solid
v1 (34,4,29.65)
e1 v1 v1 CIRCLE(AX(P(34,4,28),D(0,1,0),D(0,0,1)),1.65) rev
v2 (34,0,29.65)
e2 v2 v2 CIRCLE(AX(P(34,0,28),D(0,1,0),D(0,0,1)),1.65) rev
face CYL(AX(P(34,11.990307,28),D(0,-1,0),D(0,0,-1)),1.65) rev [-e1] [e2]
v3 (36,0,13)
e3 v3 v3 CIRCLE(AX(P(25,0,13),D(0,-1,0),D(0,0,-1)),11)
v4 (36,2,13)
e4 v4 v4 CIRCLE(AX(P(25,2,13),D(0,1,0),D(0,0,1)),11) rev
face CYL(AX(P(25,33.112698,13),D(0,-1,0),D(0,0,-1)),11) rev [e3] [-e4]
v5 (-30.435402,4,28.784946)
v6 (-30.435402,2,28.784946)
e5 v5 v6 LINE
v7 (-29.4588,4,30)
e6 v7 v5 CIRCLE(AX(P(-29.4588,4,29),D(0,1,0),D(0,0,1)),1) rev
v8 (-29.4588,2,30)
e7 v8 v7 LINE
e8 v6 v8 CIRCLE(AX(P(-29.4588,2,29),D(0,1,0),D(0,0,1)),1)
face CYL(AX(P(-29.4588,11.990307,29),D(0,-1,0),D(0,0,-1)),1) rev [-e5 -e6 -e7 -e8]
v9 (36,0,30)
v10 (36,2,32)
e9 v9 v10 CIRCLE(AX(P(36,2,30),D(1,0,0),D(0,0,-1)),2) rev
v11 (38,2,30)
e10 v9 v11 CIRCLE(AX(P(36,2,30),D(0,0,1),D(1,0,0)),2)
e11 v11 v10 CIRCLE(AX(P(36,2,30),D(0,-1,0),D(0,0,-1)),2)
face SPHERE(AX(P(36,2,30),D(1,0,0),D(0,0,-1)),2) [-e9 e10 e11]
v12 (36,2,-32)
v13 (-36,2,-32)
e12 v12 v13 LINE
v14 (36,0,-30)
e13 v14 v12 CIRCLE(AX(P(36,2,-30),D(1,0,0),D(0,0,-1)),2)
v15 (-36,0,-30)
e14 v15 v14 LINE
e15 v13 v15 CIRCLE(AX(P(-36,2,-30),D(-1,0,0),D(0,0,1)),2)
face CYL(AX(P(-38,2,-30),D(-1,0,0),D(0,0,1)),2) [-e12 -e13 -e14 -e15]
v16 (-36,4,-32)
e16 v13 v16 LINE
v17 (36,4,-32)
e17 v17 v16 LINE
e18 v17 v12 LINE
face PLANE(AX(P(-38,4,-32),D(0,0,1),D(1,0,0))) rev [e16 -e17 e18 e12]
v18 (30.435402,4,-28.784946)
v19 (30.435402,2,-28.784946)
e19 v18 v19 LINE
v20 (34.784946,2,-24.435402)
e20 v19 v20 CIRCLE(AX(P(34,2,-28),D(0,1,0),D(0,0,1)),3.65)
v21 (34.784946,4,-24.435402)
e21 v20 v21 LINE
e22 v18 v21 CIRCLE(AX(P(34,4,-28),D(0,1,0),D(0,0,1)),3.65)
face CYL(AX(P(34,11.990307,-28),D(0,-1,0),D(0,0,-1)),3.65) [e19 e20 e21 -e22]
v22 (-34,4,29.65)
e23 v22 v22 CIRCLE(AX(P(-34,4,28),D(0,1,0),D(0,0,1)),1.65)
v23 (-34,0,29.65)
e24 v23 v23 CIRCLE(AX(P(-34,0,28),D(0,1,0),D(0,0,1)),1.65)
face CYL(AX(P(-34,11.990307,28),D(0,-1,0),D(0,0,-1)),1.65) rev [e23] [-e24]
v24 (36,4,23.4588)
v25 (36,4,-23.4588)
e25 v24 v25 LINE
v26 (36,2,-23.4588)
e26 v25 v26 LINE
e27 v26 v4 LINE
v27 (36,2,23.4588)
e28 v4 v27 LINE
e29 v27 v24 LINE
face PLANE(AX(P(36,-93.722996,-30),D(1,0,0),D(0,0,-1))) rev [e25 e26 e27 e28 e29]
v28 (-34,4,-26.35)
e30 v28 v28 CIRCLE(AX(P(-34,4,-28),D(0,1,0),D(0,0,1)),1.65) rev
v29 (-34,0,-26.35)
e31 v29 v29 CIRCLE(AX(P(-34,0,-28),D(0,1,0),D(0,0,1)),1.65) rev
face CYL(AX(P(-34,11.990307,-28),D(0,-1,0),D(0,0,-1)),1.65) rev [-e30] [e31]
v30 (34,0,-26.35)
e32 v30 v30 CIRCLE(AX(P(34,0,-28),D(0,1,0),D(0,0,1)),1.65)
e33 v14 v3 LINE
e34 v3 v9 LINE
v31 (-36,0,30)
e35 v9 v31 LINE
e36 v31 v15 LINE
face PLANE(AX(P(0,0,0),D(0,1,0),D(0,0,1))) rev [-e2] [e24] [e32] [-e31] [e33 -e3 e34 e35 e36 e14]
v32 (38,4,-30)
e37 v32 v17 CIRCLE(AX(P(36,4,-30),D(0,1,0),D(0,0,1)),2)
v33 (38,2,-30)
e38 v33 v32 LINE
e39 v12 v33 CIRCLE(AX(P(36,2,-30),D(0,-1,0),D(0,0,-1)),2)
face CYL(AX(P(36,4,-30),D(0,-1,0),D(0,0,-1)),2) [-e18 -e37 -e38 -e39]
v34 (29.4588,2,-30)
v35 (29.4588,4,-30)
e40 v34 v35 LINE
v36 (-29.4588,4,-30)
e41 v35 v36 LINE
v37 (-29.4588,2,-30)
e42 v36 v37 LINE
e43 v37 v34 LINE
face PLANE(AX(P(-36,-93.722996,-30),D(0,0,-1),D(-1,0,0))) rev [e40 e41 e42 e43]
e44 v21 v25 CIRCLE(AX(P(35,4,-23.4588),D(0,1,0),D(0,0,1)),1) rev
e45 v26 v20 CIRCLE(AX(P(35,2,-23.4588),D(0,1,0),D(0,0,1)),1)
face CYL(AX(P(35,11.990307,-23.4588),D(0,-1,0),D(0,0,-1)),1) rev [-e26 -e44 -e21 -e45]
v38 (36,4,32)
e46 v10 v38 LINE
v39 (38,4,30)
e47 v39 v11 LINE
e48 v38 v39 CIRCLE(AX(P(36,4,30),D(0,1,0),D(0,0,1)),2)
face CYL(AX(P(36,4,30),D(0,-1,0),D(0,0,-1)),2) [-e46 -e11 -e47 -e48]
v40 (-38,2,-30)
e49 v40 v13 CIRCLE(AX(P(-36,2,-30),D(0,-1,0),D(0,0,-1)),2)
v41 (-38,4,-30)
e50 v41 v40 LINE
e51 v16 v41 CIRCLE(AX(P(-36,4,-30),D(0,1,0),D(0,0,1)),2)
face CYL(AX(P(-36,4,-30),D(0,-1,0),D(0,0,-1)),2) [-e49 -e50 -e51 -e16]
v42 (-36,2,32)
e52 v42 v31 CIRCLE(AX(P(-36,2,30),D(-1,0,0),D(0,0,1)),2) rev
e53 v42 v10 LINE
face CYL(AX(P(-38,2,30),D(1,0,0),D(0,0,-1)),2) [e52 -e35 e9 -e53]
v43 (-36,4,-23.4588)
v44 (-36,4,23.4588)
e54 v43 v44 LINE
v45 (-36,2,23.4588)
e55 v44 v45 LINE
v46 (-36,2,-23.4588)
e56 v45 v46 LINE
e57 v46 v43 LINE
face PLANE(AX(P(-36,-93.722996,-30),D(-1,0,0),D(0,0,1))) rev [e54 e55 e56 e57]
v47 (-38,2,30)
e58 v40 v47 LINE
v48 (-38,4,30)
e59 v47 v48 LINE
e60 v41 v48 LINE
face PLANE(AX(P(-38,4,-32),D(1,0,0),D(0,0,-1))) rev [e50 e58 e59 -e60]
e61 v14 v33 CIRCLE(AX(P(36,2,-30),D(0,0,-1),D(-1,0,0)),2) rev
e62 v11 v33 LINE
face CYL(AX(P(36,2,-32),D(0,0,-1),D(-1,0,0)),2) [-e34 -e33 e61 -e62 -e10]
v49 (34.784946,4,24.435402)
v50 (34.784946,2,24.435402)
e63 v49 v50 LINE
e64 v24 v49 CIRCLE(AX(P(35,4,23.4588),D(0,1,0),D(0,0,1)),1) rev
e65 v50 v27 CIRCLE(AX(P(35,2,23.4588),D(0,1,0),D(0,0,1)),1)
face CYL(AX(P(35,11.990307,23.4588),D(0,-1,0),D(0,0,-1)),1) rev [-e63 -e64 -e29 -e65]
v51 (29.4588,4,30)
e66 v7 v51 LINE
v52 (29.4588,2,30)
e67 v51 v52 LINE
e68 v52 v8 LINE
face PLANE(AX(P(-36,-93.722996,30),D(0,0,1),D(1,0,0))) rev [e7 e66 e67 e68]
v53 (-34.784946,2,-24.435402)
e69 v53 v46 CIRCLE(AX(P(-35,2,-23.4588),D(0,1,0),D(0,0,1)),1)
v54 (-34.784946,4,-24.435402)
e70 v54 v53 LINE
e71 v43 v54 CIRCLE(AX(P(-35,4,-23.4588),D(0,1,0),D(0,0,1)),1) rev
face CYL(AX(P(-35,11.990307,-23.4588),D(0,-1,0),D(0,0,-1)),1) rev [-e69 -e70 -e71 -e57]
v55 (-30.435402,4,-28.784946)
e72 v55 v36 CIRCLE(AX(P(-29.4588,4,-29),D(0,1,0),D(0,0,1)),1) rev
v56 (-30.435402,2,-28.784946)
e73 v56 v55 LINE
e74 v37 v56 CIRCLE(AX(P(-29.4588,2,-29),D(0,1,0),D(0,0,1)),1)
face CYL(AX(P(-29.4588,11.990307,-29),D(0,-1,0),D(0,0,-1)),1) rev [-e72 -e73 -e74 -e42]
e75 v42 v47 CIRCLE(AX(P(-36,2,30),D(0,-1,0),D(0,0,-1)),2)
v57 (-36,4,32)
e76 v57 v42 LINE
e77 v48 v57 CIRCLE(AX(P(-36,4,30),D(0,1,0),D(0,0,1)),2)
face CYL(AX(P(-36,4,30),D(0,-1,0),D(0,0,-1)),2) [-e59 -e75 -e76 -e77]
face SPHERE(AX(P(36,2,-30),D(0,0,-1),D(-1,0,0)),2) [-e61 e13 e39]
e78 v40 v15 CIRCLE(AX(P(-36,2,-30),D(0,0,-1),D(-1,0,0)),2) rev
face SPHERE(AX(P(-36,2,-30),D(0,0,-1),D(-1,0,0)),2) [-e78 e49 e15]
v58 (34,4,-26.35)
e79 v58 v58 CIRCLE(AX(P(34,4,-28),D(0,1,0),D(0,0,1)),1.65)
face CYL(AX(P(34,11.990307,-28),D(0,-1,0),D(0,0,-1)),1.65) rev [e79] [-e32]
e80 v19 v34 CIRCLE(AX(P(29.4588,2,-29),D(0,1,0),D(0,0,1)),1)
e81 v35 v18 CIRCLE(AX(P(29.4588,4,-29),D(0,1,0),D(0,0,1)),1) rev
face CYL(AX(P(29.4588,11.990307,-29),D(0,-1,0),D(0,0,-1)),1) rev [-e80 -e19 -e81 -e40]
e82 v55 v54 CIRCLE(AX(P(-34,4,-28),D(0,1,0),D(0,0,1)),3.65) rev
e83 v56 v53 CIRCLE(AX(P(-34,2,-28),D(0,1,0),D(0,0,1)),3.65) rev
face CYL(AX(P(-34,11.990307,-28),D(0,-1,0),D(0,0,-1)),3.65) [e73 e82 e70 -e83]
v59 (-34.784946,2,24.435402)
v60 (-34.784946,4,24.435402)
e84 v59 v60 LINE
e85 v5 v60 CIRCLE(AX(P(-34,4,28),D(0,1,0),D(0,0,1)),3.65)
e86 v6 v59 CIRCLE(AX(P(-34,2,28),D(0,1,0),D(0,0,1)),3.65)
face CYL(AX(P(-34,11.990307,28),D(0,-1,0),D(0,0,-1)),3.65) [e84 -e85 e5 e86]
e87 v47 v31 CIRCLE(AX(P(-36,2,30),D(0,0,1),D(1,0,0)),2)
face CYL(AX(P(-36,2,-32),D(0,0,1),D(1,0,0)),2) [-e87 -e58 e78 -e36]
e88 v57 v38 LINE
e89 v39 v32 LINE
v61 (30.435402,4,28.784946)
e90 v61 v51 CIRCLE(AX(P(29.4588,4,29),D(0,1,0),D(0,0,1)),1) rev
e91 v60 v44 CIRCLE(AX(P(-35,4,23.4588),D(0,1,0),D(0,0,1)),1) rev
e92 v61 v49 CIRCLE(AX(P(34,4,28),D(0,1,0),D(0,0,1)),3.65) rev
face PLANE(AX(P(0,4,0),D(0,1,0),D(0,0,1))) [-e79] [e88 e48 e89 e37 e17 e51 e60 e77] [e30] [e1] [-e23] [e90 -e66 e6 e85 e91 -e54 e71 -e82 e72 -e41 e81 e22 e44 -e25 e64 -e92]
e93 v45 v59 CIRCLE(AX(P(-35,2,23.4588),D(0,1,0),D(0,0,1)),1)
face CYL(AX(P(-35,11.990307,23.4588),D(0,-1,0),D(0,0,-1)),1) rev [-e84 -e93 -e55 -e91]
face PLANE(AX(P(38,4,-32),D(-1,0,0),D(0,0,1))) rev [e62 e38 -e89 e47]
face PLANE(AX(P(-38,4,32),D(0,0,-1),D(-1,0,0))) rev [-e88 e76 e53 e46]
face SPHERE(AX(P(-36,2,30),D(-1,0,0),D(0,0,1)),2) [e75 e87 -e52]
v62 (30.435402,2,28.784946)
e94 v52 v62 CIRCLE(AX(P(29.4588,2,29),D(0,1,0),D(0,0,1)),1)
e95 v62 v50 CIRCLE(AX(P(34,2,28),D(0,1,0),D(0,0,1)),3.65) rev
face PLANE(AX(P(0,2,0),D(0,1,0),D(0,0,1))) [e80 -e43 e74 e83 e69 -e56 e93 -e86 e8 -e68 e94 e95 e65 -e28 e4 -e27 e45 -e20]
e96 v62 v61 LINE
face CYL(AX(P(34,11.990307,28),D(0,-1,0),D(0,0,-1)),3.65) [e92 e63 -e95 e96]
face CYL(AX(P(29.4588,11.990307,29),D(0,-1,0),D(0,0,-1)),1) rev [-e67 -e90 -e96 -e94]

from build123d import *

# Parameters (mm, degrees)
SCHIZZO1_W                   = 76
SCHIZZO1_H                   = 64
ESTRUSIONE_ESTRUSIONE1_DEPTH = 4
SCHIZZO2_W                   = 72
SCHIZZO2_H                   = 60
TAGLIO_ESTRUSIONE1_DEPTH     = 2
SCHIZZO3_R                   = 3.65
SCHIZZO3_R_2                 = 1.65
ESTRUSIONE_ESTRUSIONE2_DEPTH = 2
SCHIZZO3_11_R                = 1.65
TAGLIO_ESTRUSIONE4_DEPTH     = 50.719211579
SCHIZZO5_R                   = 11
TAGLIO_ESTRUSIONE5_DEPTH     = 2
RACCORDO1_R                  = 1
RACCORDO2_R                  = 2


with BuildPart() as part:
    # Schizzo1 → Estrusione-Estrusione1 (new body)
    with BuildSketch(Plane(origin=(0, 0, 0), x_dir=(1, 0, 0), z_dir=(0, 1, 0))):
        Rectangle(SCHIZZO1_W, SCHIZZO1_H)
    extrude(amount=ESTRUSIONE_ESTRUSIONE1_DEPTH)

    # Schizzo2 → Taglio-Estrusione1 (cut)
    with BuildSketch(Plane(origin=(0, 4, 0), x_dir=(1, 0, 0), z_dir=(0, 1, 0))):
        Rectangle(SCHIZZO2_W, SCHIZZO2_H)
    extrude(amount=-TAGLIO_ESTRUSIONE1_DEPTH, mode=Mode.SUBTRACT)

    # Schizzo3 → Estrusione-Estrusione2 (add)
    # profile 1 of 4: a face of its own
    with BuildSketch(Plane(origin=(0, 2, 0), x_dir=(1, 0, 0), z_dir=(0, 1, 0))):
        with Locations((34, 28)):
            Circle(SCHIZZO3_R)
        with Locations(Location((34, 28, 0), (0, 0, 270))):
            Circle(SCHIZZO3_R_2, mode=Mode.SUBTRACT)
    # profile 2 of 4: a face of its own
    with BuildSketch(Plane(origin=(0, 2, 0), x_dir=(1, 0, 0), z_dir=(0, 1, 0))):
        with Locations((-34, 28)):
            Circle(SCHIZZO3_R)
        with Locations(Location((-34, 28, 0), (0, 0, 270))):
            Circle(SCHIZZO3_R_2, mode=Mode.SUBTRACT)
    # profile 3 of 4: a face of its own
    with BuildSketch(Plane(origin=(0, 2, 0), x_dir=(1, 0, 0), z_dir=(0, 1, 0))):
        with Locations((34, -28)):
            Circle(SCHIZZO3_R)
        with Locations(Location((34, -28, 0), (0, 0, 270))):
            Circle(SCHIZZO3_R_2, mode=Mode.SUBTRACT)
    # profile 4 of 4: a face of its own
    with BuildSketch(Plane(origin=(0, 2, 0), x_dir=(1, 0, 0), z_dir=(0, 1, 0))):
        with Locations((-34, -28)):
            Circle(SCHIZZO3_R)
        with Locations(Location((-34, -28, 0), (0, 0, 270))):
            Circle(SCHIZZO3_R_2, mode=Mode.SUBTRACT)
    extrude(amount=ESTRUSIONE_ESTRUSIONE2_DEPTH)

    # Schizzo3<11> → Taglio-Estrusione4 (cut, through all)
    with BuildSketch(Plane(origin=(0, 2, 0), x_dir=(1, 0, 0), z_dir=(0, 1, 0))):
        with Locations(Location((-34, 28, 0), (0, 0, 270))):
            Circle(SCHIZZO3_11_R)
        with Locations(Location((-34, -28, 0), (0, 0, 270))):
            Circle(SCHIZZO3_11_R)
        with Locations(Location((34, -28, 0), (0, 0, 270))):
            Circle(SCHIZZO3_11_R)
        with Locations(Location((34, 28, 0), (0, 0, 270))):
            Circle(SCHIZZO3_11_R)
    extrude(amount=-TAGLIO_ESTRUSIONE4_DEPTH, mode=Mode.SUBTRACT)

    # Schizzo5 → Taglio-Estrusione5 (cut)
    with BuildSketch(Plane.XZ):
        with Locations(Location((25, 13, 0), (0, 0, 270))):
            Circle(SCHIZZO5_R)
    extrude(amount=-TAGLIO_ESTRUSIONE5_DEPTH, mode=Mode.SUBTRACT)

    # Raccordo1
    raccordo1_edges = [part.edges().sort_by_distance(p)[0] for p in [
        (30.946723072, 3, -30),
        (36, 3, -24.946723072),
        (-36, 3, -24.946723072),
        (-30.946723072, 3, -30),
        (-30.946723072, 3, 30),
        (-36, 3, 24.946723072),
        (36, 3, 24.946723072),
        (30.946723072, 3, 30),
    ]]
    fillet(raccordo1_edges, radius=RACCORDO1_R)

    # Raccordo2
    raccordo2_edges = [part.edges().sort_by_distance(p)[0] for p in [
        (0, 0, 32),
        (-38, 0, 0),
        (0, 0, -32),
        (38, 0, 0),
        (38, 2, 32),
        (-38, 2, 32),
        (-38, 2, -32),
        (38, 2, -32),
    ]]
    fillet(raccordo2_edges, radius=RACCORDO2_R - 0.0001)  # a hair under: the kernel refuses the full size


solid = part.part
